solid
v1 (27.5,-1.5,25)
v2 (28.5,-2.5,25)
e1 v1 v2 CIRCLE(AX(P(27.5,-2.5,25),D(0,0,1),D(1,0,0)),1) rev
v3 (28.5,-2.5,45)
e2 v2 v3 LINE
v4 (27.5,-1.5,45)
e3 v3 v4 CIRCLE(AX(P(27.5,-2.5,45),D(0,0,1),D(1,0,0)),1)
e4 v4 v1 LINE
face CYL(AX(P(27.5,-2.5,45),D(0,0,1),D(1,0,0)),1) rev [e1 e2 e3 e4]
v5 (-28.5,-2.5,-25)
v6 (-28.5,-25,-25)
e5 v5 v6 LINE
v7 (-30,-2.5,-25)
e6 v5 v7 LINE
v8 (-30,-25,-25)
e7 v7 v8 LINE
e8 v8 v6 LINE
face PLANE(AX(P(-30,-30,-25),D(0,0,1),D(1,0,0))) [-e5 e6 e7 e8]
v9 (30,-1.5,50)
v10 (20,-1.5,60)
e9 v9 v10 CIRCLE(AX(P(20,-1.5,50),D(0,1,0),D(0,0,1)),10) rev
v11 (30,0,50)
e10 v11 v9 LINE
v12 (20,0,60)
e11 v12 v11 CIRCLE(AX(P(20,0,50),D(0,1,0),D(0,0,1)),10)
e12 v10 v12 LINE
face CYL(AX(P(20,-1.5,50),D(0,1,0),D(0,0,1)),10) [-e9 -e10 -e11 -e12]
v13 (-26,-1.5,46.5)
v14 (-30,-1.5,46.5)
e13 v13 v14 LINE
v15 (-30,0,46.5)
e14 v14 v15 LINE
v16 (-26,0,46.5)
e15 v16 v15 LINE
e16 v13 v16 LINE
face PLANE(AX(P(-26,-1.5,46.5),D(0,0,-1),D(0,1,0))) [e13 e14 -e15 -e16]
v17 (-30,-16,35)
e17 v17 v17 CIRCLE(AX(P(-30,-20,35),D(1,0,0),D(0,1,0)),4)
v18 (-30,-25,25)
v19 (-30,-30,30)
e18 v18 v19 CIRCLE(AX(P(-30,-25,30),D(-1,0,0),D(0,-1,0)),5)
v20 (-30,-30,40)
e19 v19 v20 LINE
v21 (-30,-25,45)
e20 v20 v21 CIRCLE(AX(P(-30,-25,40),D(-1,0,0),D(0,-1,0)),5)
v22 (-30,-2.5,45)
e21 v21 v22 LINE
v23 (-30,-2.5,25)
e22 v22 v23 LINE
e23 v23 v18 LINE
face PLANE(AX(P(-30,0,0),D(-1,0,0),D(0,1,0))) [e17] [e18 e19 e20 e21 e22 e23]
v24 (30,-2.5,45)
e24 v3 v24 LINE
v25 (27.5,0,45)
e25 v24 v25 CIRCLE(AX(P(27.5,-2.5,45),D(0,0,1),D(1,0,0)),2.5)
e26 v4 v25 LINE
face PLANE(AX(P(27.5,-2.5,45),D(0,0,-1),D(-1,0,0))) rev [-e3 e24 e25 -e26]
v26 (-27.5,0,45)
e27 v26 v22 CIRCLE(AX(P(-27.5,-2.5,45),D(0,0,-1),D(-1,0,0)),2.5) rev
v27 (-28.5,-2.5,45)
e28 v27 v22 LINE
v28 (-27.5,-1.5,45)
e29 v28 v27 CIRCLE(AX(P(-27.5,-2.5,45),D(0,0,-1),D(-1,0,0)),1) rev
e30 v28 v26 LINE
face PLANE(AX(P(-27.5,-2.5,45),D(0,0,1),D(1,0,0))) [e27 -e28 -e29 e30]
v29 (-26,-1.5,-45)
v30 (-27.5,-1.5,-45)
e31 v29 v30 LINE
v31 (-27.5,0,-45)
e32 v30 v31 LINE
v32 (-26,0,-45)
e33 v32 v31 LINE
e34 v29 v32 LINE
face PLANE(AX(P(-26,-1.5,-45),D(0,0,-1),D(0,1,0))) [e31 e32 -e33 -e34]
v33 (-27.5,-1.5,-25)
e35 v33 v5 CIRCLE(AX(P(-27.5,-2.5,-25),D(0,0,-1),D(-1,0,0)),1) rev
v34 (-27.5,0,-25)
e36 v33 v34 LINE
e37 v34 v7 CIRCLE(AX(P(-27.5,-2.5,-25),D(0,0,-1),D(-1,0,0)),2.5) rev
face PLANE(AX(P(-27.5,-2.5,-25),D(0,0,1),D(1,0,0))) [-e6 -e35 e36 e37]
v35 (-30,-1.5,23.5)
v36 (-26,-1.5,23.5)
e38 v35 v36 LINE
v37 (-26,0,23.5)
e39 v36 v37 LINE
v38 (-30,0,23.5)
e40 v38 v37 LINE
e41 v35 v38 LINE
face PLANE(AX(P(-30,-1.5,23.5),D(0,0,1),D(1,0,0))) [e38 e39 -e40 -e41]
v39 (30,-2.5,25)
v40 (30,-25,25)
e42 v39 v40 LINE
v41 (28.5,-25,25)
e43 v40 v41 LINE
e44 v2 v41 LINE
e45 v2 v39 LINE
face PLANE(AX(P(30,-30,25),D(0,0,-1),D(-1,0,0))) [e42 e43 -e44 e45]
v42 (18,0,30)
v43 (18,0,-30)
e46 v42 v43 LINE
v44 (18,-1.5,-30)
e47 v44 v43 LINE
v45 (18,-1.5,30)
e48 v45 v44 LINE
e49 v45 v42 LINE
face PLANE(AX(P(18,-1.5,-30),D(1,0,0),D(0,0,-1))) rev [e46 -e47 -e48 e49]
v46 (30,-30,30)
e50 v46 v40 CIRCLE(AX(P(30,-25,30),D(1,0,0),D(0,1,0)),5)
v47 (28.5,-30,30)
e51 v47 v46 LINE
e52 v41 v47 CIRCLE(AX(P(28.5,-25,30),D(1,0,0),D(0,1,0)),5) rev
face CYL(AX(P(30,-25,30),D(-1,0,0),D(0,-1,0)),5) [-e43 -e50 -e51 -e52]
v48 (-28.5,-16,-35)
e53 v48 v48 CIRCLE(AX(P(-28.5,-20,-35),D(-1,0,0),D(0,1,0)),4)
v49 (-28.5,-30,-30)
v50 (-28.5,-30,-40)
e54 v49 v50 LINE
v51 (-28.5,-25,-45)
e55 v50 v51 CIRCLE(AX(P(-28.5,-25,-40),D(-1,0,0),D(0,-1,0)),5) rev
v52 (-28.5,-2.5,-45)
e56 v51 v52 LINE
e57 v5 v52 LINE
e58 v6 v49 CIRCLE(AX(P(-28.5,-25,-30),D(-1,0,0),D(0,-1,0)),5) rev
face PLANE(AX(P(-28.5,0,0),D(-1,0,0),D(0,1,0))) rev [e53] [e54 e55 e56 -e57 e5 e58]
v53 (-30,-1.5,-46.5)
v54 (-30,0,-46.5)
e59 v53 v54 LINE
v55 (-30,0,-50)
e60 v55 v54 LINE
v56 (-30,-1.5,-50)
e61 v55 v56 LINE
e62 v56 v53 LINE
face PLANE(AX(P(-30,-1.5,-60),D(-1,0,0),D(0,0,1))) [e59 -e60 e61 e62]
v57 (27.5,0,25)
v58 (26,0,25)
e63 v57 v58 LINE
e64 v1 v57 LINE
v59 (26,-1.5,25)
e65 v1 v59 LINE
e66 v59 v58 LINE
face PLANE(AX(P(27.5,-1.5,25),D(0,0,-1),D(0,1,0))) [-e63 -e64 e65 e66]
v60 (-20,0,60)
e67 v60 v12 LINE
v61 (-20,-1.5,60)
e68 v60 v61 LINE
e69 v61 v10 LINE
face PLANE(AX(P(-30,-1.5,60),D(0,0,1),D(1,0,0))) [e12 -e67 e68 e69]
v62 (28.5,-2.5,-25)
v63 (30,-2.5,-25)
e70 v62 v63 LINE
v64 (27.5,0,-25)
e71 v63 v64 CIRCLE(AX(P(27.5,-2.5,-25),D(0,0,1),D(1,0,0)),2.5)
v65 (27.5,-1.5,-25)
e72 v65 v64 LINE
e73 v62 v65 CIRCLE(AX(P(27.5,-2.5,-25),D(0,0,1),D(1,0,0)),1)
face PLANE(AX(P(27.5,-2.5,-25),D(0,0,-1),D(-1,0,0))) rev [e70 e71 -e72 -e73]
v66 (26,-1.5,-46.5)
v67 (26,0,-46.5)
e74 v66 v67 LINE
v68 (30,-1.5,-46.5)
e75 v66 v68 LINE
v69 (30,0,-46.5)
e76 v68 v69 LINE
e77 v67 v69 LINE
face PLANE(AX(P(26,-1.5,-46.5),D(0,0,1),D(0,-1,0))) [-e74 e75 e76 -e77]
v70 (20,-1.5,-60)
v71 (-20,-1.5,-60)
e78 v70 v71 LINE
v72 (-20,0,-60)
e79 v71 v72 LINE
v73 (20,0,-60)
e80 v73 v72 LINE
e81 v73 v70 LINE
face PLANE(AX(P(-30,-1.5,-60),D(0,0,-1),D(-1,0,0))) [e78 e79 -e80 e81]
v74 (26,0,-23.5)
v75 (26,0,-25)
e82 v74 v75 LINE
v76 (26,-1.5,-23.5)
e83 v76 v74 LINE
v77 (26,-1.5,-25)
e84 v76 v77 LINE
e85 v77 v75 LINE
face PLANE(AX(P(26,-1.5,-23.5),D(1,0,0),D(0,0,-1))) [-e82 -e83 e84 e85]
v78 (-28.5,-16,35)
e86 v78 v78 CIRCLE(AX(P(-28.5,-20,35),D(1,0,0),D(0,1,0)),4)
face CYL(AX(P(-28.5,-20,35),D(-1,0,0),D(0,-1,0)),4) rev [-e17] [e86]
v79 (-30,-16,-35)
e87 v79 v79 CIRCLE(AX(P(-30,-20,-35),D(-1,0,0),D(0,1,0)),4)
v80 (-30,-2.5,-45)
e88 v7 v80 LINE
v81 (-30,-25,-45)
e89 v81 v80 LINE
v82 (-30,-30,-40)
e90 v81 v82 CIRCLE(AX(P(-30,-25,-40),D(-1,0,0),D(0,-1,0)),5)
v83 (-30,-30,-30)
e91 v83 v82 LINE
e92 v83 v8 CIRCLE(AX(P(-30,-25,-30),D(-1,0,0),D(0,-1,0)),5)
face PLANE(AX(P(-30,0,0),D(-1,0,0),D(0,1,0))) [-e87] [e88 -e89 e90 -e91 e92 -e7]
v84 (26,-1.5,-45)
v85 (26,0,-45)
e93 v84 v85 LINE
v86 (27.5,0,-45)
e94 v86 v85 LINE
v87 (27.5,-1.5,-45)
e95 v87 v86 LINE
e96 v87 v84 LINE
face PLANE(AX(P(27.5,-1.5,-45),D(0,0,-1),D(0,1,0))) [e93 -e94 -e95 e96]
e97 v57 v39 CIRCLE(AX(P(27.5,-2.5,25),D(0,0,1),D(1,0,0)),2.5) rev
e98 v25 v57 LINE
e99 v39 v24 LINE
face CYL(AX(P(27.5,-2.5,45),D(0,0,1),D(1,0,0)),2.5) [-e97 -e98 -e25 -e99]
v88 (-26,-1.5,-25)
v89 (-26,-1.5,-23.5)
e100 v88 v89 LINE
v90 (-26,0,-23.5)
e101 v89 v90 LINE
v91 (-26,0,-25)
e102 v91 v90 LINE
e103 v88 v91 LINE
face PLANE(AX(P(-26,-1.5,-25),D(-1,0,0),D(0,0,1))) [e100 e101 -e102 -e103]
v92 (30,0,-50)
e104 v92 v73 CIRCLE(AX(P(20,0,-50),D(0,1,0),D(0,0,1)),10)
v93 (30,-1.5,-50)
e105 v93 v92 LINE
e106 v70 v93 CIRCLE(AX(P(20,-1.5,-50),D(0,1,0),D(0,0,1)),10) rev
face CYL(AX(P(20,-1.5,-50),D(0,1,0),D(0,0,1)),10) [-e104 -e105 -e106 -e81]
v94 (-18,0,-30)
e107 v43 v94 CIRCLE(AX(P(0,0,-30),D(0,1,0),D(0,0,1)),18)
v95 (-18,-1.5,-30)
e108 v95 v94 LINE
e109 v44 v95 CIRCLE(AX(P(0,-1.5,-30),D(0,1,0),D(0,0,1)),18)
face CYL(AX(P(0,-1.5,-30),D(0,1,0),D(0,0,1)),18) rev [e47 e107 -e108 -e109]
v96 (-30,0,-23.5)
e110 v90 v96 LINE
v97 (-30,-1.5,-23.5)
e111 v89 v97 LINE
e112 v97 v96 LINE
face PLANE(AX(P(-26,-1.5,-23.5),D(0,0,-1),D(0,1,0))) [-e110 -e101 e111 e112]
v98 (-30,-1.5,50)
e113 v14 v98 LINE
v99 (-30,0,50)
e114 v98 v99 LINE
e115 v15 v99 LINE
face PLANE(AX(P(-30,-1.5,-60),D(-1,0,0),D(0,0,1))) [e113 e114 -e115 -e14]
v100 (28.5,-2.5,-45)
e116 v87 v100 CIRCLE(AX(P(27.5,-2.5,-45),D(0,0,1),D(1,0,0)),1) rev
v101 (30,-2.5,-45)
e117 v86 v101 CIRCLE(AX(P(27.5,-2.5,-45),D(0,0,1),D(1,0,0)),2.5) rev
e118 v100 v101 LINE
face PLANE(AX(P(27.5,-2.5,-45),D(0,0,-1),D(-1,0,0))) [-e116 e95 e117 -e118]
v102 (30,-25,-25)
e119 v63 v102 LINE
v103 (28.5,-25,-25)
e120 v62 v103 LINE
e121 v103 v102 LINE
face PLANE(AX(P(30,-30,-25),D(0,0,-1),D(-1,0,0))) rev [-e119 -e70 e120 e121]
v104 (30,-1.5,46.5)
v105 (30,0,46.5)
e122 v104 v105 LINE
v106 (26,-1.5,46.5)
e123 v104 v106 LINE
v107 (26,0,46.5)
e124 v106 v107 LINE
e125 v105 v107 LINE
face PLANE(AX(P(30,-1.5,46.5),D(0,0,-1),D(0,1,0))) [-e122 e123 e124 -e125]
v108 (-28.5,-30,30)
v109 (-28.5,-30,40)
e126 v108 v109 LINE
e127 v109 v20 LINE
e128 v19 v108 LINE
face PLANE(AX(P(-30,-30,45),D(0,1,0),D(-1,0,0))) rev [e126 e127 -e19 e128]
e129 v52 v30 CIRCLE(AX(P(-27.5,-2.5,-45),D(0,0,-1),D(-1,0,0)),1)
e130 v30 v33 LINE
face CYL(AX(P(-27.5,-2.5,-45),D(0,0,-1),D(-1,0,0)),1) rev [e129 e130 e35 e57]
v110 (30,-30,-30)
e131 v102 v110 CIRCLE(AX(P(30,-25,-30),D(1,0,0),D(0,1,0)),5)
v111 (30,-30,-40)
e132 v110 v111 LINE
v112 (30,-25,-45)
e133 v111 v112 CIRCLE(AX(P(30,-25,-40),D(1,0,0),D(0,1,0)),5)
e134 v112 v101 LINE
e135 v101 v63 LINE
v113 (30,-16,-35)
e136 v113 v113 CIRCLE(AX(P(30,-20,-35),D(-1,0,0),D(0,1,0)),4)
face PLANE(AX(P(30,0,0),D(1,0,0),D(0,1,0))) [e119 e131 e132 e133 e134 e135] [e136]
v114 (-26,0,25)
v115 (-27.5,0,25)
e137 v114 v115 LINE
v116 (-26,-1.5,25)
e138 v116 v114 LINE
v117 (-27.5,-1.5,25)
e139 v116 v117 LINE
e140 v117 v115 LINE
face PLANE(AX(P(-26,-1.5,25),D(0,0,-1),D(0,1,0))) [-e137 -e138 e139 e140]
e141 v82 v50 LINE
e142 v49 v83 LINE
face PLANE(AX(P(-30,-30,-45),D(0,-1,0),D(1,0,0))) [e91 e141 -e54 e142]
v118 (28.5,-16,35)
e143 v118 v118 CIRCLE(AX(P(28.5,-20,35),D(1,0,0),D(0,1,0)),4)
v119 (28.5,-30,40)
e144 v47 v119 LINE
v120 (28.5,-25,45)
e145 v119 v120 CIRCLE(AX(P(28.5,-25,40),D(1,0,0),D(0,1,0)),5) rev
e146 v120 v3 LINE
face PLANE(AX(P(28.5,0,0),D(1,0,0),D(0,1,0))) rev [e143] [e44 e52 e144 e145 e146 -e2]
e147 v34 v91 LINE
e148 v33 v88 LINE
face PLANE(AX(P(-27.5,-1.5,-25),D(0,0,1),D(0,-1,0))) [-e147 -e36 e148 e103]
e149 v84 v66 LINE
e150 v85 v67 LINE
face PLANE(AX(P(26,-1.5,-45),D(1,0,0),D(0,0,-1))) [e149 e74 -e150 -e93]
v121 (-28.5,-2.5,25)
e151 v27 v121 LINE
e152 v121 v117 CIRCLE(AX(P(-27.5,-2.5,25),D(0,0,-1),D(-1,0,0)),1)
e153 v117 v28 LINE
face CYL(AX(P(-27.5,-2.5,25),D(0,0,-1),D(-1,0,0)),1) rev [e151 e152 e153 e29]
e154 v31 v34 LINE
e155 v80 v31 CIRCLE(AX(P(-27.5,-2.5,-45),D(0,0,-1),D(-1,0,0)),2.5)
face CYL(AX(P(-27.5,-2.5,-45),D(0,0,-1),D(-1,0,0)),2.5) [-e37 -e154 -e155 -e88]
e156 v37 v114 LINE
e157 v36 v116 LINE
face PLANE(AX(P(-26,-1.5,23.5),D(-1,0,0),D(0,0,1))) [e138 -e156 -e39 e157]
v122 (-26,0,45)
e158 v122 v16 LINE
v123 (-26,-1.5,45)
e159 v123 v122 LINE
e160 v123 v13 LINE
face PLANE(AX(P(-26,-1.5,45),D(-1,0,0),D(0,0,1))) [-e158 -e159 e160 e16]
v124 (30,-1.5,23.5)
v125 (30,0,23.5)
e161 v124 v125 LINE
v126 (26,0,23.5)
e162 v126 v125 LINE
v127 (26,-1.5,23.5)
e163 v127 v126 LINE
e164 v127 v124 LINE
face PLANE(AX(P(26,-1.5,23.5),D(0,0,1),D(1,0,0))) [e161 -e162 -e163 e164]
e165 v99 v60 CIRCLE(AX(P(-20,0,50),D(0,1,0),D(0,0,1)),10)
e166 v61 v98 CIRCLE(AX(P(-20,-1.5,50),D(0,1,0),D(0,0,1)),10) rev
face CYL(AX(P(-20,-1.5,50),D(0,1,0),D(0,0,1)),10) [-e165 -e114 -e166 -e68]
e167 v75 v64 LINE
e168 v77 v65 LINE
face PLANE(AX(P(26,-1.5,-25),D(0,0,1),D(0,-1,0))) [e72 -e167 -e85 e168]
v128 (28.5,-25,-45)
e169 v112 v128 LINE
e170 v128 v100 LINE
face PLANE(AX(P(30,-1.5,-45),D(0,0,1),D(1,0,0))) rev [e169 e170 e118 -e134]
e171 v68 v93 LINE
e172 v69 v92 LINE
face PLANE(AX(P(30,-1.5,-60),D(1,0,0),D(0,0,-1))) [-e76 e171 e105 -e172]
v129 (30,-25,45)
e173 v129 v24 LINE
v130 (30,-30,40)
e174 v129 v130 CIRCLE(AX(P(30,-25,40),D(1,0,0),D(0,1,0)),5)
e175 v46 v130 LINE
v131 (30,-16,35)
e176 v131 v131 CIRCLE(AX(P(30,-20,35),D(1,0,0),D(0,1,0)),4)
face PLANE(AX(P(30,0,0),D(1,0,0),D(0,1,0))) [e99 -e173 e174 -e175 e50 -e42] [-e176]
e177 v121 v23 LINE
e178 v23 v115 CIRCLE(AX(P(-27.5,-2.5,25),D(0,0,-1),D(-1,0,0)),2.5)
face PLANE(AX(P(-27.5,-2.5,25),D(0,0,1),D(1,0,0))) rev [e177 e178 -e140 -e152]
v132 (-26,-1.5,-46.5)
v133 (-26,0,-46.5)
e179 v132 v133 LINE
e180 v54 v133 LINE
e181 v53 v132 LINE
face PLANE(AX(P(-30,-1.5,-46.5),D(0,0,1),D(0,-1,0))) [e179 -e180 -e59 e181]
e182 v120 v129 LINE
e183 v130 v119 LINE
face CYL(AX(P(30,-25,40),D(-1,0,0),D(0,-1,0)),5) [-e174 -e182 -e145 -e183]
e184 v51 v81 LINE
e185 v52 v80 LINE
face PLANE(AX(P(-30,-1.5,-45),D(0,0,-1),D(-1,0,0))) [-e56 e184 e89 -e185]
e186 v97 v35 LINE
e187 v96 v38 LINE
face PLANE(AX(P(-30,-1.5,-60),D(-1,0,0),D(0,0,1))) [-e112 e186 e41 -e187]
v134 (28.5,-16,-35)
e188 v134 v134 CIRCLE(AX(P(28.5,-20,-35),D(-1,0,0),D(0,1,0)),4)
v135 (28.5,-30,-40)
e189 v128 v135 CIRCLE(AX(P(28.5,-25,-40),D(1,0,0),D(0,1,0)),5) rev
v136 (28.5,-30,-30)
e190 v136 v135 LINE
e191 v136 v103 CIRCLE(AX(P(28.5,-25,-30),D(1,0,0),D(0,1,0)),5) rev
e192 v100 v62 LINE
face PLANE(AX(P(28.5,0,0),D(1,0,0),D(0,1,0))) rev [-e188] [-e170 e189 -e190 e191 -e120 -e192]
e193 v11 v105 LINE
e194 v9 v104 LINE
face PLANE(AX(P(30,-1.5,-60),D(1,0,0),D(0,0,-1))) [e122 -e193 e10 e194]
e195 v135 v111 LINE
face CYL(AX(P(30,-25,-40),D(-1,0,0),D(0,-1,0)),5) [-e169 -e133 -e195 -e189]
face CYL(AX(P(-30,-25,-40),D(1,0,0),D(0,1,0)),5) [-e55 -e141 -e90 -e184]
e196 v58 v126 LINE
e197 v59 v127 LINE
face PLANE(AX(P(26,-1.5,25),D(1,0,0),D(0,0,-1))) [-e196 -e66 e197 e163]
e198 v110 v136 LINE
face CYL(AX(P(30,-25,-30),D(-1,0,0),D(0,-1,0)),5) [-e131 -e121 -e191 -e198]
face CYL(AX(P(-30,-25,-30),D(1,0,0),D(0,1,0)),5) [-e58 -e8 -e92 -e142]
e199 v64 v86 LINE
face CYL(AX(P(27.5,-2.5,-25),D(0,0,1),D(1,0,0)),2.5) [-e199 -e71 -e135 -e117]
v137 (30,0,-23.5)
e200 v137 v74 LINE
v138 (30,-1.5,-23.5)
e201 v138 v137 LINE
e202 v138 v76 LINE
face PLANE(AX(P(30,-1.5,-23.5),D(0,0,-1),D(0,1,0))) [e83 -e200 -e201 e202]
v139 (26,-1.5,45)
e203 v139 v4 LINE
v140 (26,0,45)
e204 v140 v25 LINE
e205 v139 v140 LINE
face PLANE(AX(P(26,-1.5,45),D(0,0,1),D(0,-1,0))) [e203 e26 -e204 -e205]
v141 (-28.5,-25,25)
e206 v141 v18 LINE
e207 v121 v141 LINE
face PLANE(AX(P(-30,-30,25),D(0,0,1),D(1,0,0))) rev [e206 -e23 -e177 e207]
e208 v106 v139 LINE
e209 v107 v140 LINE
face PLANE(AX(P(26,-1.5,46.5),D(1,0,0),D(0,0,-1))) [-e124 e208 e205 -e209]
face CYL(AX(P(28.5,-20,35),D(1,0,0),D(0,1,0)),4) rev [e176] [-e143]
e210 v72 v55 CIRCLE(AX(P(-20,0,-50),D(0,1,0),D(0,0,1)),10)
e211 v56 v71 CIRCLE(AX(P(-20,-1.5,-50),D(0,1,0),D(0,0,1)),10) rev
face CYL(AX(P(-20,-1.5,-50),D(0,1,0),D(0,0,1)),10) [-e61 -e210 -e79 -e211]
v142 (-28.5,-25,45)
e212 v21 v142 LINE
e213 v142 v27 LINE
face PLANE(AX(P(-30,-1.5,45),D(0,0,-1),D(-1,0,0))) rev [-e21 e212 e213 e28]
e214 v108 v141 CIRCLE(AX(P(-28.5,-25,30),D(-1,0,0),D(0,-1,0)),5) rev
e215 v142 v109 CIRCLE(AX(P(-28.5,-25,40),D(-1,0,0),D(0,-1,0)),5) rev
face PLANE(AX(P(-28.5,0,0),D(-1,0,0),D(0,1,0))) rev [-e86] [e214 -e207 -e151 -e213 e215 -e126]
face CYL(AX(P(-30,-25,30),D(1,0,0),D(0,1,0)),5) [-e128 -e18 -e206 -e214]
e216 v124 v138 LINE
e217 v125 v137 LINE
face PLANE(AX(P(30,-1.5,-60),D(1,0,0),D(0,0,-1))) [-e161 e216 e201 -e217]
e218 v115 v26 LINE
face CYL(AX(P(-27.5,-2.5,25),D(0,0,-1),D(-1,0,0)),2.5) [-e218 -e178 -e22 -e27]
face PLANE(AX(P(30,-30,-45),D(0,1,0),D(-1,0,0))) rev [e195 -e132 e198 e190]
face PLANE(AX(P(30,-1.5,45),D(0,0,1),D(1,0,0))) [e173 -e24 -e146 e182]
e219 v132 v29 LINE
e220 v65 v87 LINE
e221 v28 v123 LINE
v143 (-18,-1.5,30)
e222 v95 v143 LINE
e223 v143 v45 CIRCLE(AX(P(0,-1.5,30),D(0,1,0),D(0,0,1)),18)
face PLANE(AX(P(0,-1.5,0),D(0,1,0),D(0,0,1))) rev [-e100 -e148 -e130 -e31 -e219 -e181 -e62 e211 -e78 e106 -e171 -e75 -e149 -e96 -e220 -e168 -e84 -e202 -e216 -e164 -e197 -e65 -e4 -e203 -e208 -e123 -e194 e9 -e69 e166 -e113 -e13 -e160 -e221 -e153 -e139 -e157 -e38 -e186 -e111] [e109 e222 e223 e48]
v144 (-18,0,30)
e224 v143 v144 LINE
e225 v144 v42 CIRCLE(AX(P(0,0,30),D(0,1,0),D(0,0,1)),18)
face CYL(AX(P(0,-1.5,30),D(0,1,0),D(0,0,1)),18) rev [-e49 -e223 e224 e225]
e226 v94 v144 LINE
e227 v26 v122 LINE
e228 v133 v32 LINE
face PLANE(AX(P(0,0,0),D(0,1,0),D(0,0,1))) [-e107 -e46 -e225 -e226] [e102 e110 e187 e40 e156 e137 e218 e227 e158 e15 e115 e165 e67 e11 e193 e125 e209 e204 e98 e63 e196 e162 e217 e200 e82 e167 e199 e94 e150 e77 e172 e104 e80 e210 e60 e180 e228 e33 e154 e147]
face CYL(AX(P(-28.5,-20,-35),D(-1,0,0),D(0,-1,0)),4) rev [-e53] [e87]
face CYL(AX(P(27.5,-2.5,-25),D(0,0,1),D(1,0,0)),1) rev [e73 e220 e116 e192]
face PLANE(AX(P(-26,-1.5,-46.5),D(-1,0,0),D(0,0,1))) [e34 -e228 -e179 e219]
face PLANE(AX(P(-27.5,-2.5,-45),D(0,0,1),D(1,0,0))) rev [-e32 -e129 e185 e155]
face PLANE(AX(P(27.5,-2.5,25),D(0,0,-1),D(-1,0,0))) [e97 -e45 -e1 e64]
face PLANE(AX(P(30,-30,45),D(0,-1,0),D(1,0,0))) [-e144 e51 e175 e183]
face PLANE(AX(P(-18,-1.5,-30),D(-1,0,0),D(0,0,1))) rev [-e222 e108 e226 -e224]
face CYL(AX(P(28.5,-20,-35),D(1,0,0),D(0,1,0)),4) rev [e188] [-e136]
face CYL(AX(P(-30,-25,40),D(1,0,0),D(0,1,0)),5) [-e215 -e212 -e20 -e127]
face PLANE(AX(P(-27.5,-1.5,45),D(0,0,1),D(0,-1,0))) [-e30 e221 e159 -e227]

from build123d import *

# Parameters (mm, degrees)
SKETCH1_W                     = 60
SKETCH1_H                     = 120
BASE_FLANGE1_DEPTH            = 1.5
CUT_EXTRUDE1_DEPTH            = 10
BREAK_CORNER1_START           = -1.5
BREAK_CORNER1_DEPTH           = 1.5
EDGE_FLANGE1_STRIP_W          = 8
EDGE_FLANGE1_STRIP_H          = 1.5
EDGE_FLANGE1_STRIP_CUT_DEPTH  = 20
EDGE_FLANGE1_RELIEF_W         = 9.5
EDGE_FLANGE1_RELIEF_H         = 1.5
EDGE_FLANGE1_RELIEF_CUT_DEPTH = 1.5
EDGE_FLANGE1_DEPTH            = 20
SKETCH10_R                    = 4
CUT_EXTRUDE2_DEPTH            = 10
MIRROR2_COPY_1_SKETCH_W       = 8
MIRROR2_COPY_1_SKETCH_H       = 1.5
MIRROR2_COPY_1_DEPTH          = 20
MIRROR2_COPY_2_SKETCH_W       = 9.5
MIRROR2_COPY_2_SKETCH_H       = 1.5
MIRROR2_COPY_2_DEPTH          = 1.5
MIRROR2_COPY_3_DEPTH          = 20
MIRROR2_COPY_4_SKETCH_R       = 4
MIRROR2_COPY_4_DEPTH          = 10
BREAK_CORNER2_START           = -30
BREAK_CORNER2_DEPTH           = 60


# Read off the part's stored shape, not the designer's step: Break-Corner1, Break-Corner2
# Sheet-metal steps are written as plain solids
with BuildPart() as part:
    # Sketch1 → Base-Flange1 (new body)
    with BuildSketch(Plane(origin=(0, 0, 0), x_dir=(1, 0, 0), z_dir=(0, 1, 0))):
        Rectangle(SKETCH1_W, SKETCH1_H)
    extrude(amount=-BASE_FLANGE1_DEPTH)

    # Sketch6 → Cut-Extrude1 (cut)
    with BuildSketch(Plane(origin=(0, 0, 0), x_dir=(1, 0, 0), z_dir=(0, 1, 0))):
        with BuildLine():
            Line((18, 30), (18, -30))
            ThreePointArc((18, -30), (0, -48), (-18, -30))
            Line((-18, -30), (-18, 30))
            ThreePointArc((-18, 30), (0, 48), (18, 30))
        make_face()
    extrude(amount=-CUT_EXTRUDE1_DEPTH, mode=Mode.SUBTRACT)

    # Break-Corner1 outline → Break-Corner1 (cut)
    with BuildSketch(Plane(origin=(0, 0, 0), x_dir=(1, 0, 0), z_dir=(0, 1, 0)).offset(BREAK_CORNER1_START)):
        with BuildLine():
            ThreePointArc((30, -50), (27.071067812, -57.071067812), (20, -60))
            Line((20, -60), (30, -60))
            Line((30, -60), (30, -50))
        make_face()
        with BuildLine():
            Line((-30, -60), (-20, -60))
            ThreePointArc((-20, -60), (-27.071067812, -57.071067812), (-30, -50))
            Line((-30, -50), (-30, -60))
        make_face()
        with BuildLine():
            ThreePointArc((20, 60), (27.071067812, 57.071067812), (30, 50))
            Line((30, 50), (30, 60))
            Line((30, 60), (20, 60))
        make_face()
        with BuildLine():
            Line((-30, 60), (-30, 50))
            ThreePointArc((-30, 50), (-27.071067812, 57.071067812), (-20, 60))
            Line((-20, 60), (-30, 60))
        make_face()
    extrude(amount=BREAK_CORNER1_DEPTH, mode=Mode.SUBTRACT)

    # Edge-Flange1 strip (across the edge) → Edge-Flange1 strip cut (cut)
    with BuildSketch(Plane(origin=(30, -1.5, 25), x_dir=(-1, 0, 0), z_dir=(0, 0, 1))):
        with Locations((-1.5, -0.75)):
            Rectangle(EDGE_FLANGE1_STRIP_W, EDGE_FLANGE1_STRIP_H)
    edge_flange1_strip_cut = extrude(amount=EDGE_FLANGE1_STRIP_CUT_DEPTH, mode=Mode.SUBTRACT)

    # Edge-Flange1 relief (on the sheet) → Edge-Flange1 relief cut (cut)
    with BuildSketch(Plane(origin=(27.5, -1.5, 25), x_dir=(-1, 0, 0), z_dir=(0, -1, 0))):
        with Locations((-3.25, 0.75)):
            Rectangle(EDGE_FLANGE1_RELIEF_W, EDGE_FLANGE1_RELIEF_H)
        with Locations((-3.25, -20.75)):
            Rectangle(EDGE_FLANGE1_RELIEF_W, EDGE_FLANGE1_RELIEF_H)
    edge_flange1_relief_cut = extrude(amount=-EDGE_FLANGE1_RELIEF_CUT_DEPTH, mode=Mode.SUBTRACT)

    # Edge-Flange1 section (across the edge) → Edge-Flange1 (add)
    with BuildSketch(Plane(origin=(30, -1.5, 25), x_dir=(-1, 0, 0), z_dir=(0, 0, 1))):
        with BuildLine():
            Line((0, 1), (0, 28.5))
            Line((0, 28.5), (1.5, 28.5))
            Line((1.5, 28.5), (1.5, 1))
            ThreePointArc((1.5, 1), (1.792893219, 0.292893219), (2.5, 0))
            Line((2.5, 0), (2.5, -1.5))
            ThreePointArc((2.5, -1.5), (0.732233047, -0.767766953), (0, 1))
        make_face()
    edge_flange1 = extrude(amount=EDGE_FLANGE1_DEPTH)

    # Sketch10 → Cut-Extrude2 (cut)
    with BuildSketch(Plane(origin=(30, 0, 0), x_dir=(0, 0, -1), z_dir=(1, 0, 0))):
        with Locations(Location((-35, -20, 0), (0, 0, 90))):
            Circle(SKETCH10_R)
    cut_extrude2 = extrude(amount=-CUT_EXTRUDE2_DEPTH, mode=Mode.SUBTRACT)

    # Mirror1: Edge-Flange1 strip cut, Edge-Flange1 relief cut, Edge-Flange1, Cut-Extrude2 across plane
    add(edge_flange1_strip_cut.mirror(Plane.XY), mode=Mode.SUBTRACT)
    add(edge_flange1_relief_cut.mirror(Plane.XY), mode=Mode.SUBTRACT)
    add(edge_flange1.mirror(Plane.XY))
    add(cut_extrude2.mirror(Plane.XY), mode=Mode.SUBTRACT)

    # Mirror2: Edge-Flange1 strip cut, Edge-Flange1 relief cut, Edge-Flange1, Cut-Extrude2 across plane
    add(edge_flange1_strip_cut.mirror(Plane(origin=(0, 0, 0), x_dir=(0, 0, 1), z_dir=(1, 0, 0))), mode=Mode.SUBTRACT)
    add(edge_flange1_relief_cut.mirror(Plane(origin=(0, 0, 0), x_dir=(0, 0, 1), z_dir=(1, 0, 0))), mode=Mode.SUBTRACT)
    add(edge_flange1.mirror(Plane(origin=(0, 0, 0), x_dir=(0, 0, 1), z_dir=(1, 0, 0))))
    add(cut_extrude2.mirror(Plane(origin=(0, 0, 0), x_dir=(0, 0, 1), z_dir=(1, 0, 0))), mode=Mode.SUBTRACT)

    # Mirror2 copy 1 sketch → Mirror2 copy 1 (cut)
    with BuildSketch(Plane(origin=(-30, -1.5, -25), x_dir=(1, 0, 0), z_dir=(0, 0, -1))):
        with Locations((-1.5, -0.75)):
            Rectangle(MIRROR2_COPY_1_SKETCH_W, MIRROR2_COPY_1_SKETCH_H)
    extrude(amount=MIRROR2_COPY_1_DEPTH, mode=Mode.SUBTRACT)

    # Mirror2 copy 2 sketch → Mirror2 copy 2 (cut)
    with BuildSketch(Plane(origin=(-27.5, -1.5, -25), x_dir=(1, 0, 0), z_dir=(0, -1, 0))):
        with Locations((-3.25, 0.75)):
            Rectangle(MIRROR2_COPY_2_SKETCH_W, MIRROR2_COPY_2_SKETCH_H)
        with Locations((-3.25, -20.75)):
            Rectangle(MIRROR2_COPY_2_SKETCH_W, MIRROR2_COPY_2_SKETCH_H)
    extrude(amount=-MIRROR2_COPY_2_DEPTH, mode=Mode.SUBTRACT)

    # Mirror2 copy 3 sketch → Mirror2 copy 3 (add)
    with BuildSketch(Plane(origin=(-30, -1.5, -25), x_dir=(1, 0, 0), z_dir=(0, 0, -1))):
        with BuildLine():
            Line((0, 1), (0, 28.5))
            Line((0, 28.5), (1.5, 28.5))
            Line((1.5, 28.5), (1.5, 1))
            ThreePointArc((1.5, 1), (1.792893219, 0.292893219), (2.5, 0))
            Line((2.5, 0), (2.5, -1.5))
            ThreePointArc((2.5, -1.5), (0.732233047, -0.767766953), (0, 1))
        make_face()
    extrude(amount=MIRROR2_COPY_3_DEPTH)

    # Mirror2 copy 4 sketch → Mirror2 copy 4 (cut)
    with BuildSketch(Plane.ZY.offset(30)):
        with Locations(Location((-35, -20, 0), (0, 0, 90))):
            Circle(MIRROR2_COPY_4_SKETCH_R)
    extrude(amount=-MIRROR2_COPY_4_DEPTH, mode=Mode.SUBTRACT)

    # Break-Corner2 outline → Break-Corner2 (cut)
    with BuildSketch(Plane.YZ.offset(BREAK_CORNER2_START)):
        with BuildLine():
            Line((-30, 45), (-30, 40))
            ThreePointArc((-30, 40), (-28.535533906, 43.535533906), (-25, 45))
            Line((-25, 45), (-30, 45))
        make_face()
        with BuildLine():
            ThreePointArc((-25, 25), (-28.535533906, 26.464466094), (-30, 30))
            Line((-30, 30), (-30, 25))
            Line((-30, 25), (-25, 25))
        make_face()
        with BuildLine():
            ThreePointArc((-25, -45), (-28.535533906, -43.535533906), (-30, -40))
            Line((-30, -40), (-30, -45))
            Line((-30, -45), (-25, -45))
        make_face()
        with BuildLine():
            Line((-30, -25), (-30, -30))
            ThreePointArc((-30, -30), (-28.535533906, -26.464466094), (-25, -25))
            Line((-25, -25), (-30, -25))
        make_face()
    extrude(amount=BREAK_CORNER2_DEPTH, mode=Mode.SUBTRACT)


solid = part.part
